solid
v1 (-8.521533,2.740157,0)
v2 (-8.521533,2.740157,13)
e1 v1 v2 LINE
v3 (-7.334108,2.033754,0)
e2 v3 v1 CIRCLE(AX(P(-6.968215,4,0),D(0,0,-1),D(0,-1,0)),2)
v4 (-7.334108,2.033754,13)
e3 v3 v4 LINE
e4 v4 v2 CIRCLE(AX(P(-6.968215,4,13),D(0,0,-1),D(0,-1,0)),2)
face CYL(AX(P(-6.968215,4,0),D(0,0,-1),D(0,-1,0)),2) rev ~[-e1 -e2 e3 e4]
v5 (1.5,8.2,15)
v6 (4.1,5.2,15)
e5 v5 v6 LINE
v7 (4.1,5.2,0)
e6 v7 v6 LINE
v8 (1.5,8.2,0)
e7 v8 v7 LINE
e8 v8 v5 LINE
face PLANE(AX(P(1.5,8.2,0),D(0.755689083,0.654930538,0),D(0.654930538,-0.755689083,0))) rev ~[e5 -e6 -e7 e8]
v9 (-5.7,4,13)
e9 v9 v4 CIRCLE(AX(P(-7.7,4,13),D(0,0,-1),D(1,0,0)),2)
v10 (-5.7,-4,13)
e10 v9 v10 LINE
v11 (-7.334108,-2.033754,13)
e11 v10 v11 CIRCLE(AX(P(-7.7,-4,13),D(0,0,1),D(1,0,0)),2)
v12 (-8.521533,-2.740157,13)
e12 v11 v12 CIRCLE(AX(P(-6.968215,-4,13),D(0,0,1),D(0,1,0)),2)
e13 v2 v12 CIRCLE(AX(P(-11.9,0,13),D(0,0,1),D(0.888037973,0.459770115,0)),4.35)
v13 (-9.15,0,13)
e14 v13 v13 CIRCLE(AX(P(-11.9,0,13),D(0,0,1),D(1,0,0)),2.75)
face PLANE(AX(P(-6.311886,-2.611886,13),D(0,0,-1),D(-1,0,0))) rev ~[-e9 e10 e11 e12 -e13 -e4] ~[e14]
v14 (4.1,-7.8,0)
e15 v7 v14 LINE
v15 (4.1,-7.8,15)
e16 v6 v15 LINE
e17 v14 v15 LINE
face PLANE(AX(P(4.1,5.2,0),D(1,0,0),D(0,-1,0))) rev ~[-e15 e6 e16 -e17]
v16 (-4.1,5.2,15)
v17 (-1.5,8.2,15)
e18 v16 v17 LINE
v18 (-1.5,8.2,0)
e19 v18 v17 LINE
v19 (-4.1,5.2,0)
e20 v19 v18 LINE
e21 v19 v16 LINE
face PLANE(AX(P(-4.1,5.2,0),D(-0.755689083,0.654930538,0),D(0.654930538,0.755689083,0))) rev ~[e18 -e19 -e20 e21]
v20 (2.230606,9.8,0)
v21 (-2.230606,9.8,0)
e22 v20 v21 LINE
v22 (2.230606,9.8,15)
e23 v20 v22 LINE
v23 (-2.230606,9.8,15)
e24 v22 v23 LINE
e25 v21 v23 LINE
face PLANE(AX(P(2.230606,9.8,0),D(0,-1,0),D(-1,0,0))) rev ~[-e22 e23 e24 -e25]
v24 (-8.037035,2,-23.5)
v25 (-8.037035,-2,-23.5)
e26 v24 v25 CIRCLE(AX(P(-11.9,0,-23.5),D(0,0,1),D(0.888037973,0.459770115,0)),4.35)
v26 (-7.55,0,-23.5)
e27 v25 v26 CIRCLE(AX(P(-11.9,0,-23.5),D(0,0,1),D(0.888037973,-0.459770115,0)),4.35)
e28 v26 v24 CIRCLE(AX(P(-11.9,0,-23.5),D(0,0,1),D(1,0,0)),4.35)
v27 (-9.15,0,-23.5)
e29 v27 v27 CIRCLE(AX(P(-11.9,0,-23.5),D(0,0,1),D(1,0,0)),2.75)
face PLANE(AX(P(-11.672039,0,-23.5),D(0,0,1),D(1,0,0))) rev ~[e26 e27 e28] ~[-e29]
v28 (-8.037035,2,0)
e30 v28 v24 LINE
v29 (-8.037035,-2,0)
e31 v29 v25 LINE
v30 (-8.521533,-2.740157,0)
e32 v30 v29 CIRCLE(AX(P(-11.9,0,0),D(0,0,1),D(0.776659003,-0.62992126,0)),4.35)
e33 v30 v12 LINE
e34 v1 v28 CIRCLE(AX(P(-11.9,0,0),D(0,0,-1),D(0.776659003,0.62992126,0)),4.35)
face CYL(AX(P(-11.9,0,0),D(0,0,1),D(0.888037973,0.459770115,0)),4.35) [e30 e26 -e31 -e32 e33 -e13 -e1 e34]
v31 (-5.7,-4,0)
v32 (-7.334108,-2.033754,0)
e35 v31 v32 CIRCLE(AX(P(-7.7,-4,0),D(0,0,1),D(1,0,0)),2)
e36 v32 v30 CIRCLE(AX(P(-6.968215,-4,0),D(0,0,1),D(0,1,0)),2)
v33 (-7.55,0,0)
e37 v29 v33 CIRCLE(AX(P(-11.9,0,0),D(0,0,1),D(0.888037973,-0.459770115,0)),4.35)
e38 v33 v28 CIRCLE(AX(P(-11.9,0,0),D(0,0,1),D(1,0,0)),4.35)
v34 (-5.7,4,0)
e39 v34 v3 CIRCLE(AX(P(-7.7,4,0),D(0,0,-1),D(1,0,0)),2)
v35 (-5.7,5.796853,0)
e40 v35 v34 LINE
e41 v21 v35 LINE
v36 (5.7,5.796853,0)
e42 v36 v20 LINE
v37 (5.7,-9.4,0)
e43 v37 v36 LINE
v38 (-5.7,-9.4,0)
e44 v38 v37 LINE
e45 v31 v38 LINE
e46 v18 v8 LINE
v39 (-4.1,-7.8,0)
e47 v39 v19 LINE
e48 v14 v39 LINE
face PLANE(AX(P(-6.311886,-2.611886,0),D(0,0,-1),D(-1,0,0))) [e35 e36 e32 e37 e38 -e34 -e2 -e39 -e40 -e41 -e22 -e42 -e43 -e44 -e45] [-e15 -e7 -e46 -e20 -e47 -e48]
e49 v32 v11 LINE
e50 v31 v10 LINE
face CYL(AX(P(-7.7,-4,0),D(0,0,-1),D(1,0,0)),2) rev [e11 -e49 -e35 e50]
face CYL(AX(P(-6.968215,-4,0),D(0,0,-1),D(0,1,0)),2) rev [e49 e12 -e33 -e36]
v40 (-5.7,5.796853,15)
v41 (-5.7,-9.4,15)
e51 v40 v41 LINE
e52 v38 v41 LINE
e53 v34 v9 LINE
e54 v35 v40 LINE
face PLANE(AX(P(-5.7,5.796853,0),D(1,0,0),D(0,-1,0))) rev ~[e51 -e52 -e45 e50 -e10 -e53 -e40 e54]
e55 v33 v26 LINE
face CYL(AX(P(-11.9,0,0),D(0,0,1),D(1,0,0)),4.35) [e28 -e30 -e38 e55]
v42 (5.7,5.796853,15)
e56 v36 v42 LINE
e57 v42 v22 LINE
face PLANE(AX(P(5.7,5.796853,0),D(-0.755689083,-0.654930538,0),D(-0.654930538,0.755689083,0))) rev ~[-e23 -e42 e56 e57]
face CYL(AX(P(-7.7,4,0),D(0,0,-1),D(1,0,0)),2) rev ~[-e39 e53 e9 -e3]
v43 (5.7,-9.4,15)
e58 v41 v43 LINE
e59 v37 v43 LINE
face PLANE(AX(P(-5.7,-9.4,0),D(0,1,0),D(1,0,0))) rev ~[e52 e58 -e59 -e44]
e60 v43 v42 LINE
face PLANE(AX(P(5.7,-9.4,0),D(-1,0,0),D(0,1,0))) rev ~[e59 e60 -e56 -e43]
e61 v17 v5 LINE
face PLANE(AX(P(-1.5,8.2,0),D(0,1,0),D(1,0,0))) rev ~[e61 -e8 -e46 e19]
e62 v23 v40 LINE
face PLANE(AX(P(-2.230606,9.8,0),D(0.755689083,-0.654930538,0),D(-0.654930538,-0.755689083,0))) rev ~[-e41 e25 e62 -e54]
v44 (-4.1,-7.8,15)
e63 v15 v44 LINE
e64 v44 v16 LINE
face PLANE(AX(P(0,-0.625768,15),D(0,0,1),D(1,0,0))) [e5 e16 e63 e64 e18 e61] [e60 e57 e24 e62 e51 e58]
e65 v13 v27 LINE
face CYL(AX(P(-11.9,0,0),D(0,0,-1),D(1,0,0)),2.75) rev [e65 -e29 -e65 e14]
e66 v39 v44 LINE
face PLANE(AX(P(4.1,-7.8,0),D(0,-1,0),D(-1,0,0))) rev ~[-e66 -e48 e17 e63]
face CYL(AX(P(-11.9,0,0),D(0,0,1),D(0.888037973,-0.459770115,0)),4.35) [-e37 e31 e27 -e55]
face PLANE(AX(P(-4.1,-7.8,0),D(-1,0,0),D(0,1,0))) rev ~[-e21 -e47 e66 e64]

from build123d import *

# Parameters (mm, degrees)
F1_DEPTH      = 15
F2_DEPTH      = 13
F0_R          = 2.75
F3_DEPTH      = 13
F3_DEPTH_BACK = 23.5
F4_T1_DEPTH   = 13


# Not quite as in the source:
# - a fillet or chamfer that OpenCascade refuses, or shapes differently, is made with other operations: its cross-section is extruded or revolved along the edge and cut away or added


with BuildPart() as f1:
    # F0 (on Top) → F1 (new body)
    with BuildSketch(Plane.XY):
        Polygon((2.2306062124, 9.8), (0, 9.8), (-2.2306062124, 9.8), (-5.7, 5.796853322), (-5.7, 2), (-5.7, -2), (-5.7, -9.4), (0, -9.4), (5.7, -9.4), (5.7, 5.796853322), align=None)
        Polygon((-1.5, 8.2), (0, 8.2), (1.5, 8.2), (4.1, 5.2), (4.1, -7.8), (0, -7.8), (-4.1, -7.8), (-4.1, 5.2), align=None, mode=Mode.SUBTRACT)
    extrude(amount=F1_DEPTH)

    # F0 (on Top) → F2 (join)
    with BuildSketch(Plane.XY):
        with BuildLine():
            Line((-5.7, -2), (-5.7, 2))
            Line((-5.7, 2), (-8.0370348177, 2))
            ThreePointArc((-8.0370348177, 2), (-7.6735121825, 1.0292233618), (-7.55, 0))
            ThreePointArc((-7.55, 0), (-7.6735121825, -1.0292233618), (-8.0370348177, -2))
            Line((-8.0370348177, -2), (-5.7, -2))
        make_face()
        with BuildLine():
            ThreePointArc((-7.55, 0), (-7.6735121825, 1.0292233618), (-8.0370348177, 2))
            Line((-8.0370348177, 2), (-8.4, 2))
            Line((-8.4, 2), (-8.4, -2))
            Line((-8.4, -2), (-8.0370348177, -2))
            ThreePointArc((-8.0370348177, -2), (-7.6735121825, -1.0292233618), (-7.55, 0))
        make_face()
    extrude(amount=F2_DEPTH)

    # F0 (on Top) → F3 (join, two sides)
    with BuildSketch(Plane.XY) as f3_sk:
        with BuildLine():
            Line((-8.4, 2), (-8.0370348177, 2))
            ThreePointArc((-8.0370348177, 2), (-16.25, 0), (-8.0370348177, -2))
            Line((-8.0370348177, -2), (-8.4, -2))
            Line((-8.4, -2), (-8.4, 2))
        make_face()
        with Locations((-11.9, 0)):
            Circle(F0_R, mode=Mode.SUBTRACT)
        with BuildLine():
            ThreePointArc((-7.55, 0), (-7.6735121825, 1.0292233618), (-8.0370348177, 2))
            Line((-8.0370348177, 2), (-8.4, 2))
            Line((-8.4, 2), (-8.4, -2))
            Line((-8.4, -2), (-8.0370348177, -2))
            ThreePointArc((-8.0370348177, -2), (-7.6735121825, -1.0292233618), (-7.55, 0))
        make_face()
    extrude(amount=F3_DEPTH)
    extrude(f3_sk.sketch, amount=-F3_DEPTH_BACK)

    # F4: fillet of radius 2 on 4 edges, made by hand

    # F4_s2 → F4_t1 (join)
    with BuildSketch(Plane.XY):
        with BuildLine():
            ThreePointArc((-5.7, -4), (-6.2857864376, -2.5857864376), (-7.7, -2))
            Line((-7.7, -2), (-5.7, -2))
            Line((-5.7, -2), (-5.7, -4))
        make_face()
        with BuildLine():
            ThreePointArc((-5.7, 4), (-6.2857864376, 2.5857864376), (-7.7, 2))
            Line((-7.7, 2), (-5.7, 2))
            Line((-5.7, 2), (-5.7, 4))
        make_face()
        with BuildLine():
            ThreePointArc((-6.9682153332, -2), (-7.8285393886, -2.1944966021), (-8.5215333385, -2.7401574803))
            ThreePointArc((-8.5215333385, -2.7401574803), (-8.2604200708, -2.382426901), (-8.0370348177, -2))
            Line((-8.0370348177, -2), (-6.9682153332, -2))
        make_face()
        with BuildLine():
            ThreePointArc((-6.9682153332, 2), (-7.8285393886, 2.1944966021), (-8.5215333385, 2.7401574803))
            ThreePointArc((-8.5215333385, 2.7401574803), (-8.2604200708, 2.382426901), (-8.0370348177, 2))
            Line((-8.0370348177, 2), (-6.9682153332, 2))
        make_face()
    extrude(amount=F4_T1_DEPTH)


solid = f1.part
